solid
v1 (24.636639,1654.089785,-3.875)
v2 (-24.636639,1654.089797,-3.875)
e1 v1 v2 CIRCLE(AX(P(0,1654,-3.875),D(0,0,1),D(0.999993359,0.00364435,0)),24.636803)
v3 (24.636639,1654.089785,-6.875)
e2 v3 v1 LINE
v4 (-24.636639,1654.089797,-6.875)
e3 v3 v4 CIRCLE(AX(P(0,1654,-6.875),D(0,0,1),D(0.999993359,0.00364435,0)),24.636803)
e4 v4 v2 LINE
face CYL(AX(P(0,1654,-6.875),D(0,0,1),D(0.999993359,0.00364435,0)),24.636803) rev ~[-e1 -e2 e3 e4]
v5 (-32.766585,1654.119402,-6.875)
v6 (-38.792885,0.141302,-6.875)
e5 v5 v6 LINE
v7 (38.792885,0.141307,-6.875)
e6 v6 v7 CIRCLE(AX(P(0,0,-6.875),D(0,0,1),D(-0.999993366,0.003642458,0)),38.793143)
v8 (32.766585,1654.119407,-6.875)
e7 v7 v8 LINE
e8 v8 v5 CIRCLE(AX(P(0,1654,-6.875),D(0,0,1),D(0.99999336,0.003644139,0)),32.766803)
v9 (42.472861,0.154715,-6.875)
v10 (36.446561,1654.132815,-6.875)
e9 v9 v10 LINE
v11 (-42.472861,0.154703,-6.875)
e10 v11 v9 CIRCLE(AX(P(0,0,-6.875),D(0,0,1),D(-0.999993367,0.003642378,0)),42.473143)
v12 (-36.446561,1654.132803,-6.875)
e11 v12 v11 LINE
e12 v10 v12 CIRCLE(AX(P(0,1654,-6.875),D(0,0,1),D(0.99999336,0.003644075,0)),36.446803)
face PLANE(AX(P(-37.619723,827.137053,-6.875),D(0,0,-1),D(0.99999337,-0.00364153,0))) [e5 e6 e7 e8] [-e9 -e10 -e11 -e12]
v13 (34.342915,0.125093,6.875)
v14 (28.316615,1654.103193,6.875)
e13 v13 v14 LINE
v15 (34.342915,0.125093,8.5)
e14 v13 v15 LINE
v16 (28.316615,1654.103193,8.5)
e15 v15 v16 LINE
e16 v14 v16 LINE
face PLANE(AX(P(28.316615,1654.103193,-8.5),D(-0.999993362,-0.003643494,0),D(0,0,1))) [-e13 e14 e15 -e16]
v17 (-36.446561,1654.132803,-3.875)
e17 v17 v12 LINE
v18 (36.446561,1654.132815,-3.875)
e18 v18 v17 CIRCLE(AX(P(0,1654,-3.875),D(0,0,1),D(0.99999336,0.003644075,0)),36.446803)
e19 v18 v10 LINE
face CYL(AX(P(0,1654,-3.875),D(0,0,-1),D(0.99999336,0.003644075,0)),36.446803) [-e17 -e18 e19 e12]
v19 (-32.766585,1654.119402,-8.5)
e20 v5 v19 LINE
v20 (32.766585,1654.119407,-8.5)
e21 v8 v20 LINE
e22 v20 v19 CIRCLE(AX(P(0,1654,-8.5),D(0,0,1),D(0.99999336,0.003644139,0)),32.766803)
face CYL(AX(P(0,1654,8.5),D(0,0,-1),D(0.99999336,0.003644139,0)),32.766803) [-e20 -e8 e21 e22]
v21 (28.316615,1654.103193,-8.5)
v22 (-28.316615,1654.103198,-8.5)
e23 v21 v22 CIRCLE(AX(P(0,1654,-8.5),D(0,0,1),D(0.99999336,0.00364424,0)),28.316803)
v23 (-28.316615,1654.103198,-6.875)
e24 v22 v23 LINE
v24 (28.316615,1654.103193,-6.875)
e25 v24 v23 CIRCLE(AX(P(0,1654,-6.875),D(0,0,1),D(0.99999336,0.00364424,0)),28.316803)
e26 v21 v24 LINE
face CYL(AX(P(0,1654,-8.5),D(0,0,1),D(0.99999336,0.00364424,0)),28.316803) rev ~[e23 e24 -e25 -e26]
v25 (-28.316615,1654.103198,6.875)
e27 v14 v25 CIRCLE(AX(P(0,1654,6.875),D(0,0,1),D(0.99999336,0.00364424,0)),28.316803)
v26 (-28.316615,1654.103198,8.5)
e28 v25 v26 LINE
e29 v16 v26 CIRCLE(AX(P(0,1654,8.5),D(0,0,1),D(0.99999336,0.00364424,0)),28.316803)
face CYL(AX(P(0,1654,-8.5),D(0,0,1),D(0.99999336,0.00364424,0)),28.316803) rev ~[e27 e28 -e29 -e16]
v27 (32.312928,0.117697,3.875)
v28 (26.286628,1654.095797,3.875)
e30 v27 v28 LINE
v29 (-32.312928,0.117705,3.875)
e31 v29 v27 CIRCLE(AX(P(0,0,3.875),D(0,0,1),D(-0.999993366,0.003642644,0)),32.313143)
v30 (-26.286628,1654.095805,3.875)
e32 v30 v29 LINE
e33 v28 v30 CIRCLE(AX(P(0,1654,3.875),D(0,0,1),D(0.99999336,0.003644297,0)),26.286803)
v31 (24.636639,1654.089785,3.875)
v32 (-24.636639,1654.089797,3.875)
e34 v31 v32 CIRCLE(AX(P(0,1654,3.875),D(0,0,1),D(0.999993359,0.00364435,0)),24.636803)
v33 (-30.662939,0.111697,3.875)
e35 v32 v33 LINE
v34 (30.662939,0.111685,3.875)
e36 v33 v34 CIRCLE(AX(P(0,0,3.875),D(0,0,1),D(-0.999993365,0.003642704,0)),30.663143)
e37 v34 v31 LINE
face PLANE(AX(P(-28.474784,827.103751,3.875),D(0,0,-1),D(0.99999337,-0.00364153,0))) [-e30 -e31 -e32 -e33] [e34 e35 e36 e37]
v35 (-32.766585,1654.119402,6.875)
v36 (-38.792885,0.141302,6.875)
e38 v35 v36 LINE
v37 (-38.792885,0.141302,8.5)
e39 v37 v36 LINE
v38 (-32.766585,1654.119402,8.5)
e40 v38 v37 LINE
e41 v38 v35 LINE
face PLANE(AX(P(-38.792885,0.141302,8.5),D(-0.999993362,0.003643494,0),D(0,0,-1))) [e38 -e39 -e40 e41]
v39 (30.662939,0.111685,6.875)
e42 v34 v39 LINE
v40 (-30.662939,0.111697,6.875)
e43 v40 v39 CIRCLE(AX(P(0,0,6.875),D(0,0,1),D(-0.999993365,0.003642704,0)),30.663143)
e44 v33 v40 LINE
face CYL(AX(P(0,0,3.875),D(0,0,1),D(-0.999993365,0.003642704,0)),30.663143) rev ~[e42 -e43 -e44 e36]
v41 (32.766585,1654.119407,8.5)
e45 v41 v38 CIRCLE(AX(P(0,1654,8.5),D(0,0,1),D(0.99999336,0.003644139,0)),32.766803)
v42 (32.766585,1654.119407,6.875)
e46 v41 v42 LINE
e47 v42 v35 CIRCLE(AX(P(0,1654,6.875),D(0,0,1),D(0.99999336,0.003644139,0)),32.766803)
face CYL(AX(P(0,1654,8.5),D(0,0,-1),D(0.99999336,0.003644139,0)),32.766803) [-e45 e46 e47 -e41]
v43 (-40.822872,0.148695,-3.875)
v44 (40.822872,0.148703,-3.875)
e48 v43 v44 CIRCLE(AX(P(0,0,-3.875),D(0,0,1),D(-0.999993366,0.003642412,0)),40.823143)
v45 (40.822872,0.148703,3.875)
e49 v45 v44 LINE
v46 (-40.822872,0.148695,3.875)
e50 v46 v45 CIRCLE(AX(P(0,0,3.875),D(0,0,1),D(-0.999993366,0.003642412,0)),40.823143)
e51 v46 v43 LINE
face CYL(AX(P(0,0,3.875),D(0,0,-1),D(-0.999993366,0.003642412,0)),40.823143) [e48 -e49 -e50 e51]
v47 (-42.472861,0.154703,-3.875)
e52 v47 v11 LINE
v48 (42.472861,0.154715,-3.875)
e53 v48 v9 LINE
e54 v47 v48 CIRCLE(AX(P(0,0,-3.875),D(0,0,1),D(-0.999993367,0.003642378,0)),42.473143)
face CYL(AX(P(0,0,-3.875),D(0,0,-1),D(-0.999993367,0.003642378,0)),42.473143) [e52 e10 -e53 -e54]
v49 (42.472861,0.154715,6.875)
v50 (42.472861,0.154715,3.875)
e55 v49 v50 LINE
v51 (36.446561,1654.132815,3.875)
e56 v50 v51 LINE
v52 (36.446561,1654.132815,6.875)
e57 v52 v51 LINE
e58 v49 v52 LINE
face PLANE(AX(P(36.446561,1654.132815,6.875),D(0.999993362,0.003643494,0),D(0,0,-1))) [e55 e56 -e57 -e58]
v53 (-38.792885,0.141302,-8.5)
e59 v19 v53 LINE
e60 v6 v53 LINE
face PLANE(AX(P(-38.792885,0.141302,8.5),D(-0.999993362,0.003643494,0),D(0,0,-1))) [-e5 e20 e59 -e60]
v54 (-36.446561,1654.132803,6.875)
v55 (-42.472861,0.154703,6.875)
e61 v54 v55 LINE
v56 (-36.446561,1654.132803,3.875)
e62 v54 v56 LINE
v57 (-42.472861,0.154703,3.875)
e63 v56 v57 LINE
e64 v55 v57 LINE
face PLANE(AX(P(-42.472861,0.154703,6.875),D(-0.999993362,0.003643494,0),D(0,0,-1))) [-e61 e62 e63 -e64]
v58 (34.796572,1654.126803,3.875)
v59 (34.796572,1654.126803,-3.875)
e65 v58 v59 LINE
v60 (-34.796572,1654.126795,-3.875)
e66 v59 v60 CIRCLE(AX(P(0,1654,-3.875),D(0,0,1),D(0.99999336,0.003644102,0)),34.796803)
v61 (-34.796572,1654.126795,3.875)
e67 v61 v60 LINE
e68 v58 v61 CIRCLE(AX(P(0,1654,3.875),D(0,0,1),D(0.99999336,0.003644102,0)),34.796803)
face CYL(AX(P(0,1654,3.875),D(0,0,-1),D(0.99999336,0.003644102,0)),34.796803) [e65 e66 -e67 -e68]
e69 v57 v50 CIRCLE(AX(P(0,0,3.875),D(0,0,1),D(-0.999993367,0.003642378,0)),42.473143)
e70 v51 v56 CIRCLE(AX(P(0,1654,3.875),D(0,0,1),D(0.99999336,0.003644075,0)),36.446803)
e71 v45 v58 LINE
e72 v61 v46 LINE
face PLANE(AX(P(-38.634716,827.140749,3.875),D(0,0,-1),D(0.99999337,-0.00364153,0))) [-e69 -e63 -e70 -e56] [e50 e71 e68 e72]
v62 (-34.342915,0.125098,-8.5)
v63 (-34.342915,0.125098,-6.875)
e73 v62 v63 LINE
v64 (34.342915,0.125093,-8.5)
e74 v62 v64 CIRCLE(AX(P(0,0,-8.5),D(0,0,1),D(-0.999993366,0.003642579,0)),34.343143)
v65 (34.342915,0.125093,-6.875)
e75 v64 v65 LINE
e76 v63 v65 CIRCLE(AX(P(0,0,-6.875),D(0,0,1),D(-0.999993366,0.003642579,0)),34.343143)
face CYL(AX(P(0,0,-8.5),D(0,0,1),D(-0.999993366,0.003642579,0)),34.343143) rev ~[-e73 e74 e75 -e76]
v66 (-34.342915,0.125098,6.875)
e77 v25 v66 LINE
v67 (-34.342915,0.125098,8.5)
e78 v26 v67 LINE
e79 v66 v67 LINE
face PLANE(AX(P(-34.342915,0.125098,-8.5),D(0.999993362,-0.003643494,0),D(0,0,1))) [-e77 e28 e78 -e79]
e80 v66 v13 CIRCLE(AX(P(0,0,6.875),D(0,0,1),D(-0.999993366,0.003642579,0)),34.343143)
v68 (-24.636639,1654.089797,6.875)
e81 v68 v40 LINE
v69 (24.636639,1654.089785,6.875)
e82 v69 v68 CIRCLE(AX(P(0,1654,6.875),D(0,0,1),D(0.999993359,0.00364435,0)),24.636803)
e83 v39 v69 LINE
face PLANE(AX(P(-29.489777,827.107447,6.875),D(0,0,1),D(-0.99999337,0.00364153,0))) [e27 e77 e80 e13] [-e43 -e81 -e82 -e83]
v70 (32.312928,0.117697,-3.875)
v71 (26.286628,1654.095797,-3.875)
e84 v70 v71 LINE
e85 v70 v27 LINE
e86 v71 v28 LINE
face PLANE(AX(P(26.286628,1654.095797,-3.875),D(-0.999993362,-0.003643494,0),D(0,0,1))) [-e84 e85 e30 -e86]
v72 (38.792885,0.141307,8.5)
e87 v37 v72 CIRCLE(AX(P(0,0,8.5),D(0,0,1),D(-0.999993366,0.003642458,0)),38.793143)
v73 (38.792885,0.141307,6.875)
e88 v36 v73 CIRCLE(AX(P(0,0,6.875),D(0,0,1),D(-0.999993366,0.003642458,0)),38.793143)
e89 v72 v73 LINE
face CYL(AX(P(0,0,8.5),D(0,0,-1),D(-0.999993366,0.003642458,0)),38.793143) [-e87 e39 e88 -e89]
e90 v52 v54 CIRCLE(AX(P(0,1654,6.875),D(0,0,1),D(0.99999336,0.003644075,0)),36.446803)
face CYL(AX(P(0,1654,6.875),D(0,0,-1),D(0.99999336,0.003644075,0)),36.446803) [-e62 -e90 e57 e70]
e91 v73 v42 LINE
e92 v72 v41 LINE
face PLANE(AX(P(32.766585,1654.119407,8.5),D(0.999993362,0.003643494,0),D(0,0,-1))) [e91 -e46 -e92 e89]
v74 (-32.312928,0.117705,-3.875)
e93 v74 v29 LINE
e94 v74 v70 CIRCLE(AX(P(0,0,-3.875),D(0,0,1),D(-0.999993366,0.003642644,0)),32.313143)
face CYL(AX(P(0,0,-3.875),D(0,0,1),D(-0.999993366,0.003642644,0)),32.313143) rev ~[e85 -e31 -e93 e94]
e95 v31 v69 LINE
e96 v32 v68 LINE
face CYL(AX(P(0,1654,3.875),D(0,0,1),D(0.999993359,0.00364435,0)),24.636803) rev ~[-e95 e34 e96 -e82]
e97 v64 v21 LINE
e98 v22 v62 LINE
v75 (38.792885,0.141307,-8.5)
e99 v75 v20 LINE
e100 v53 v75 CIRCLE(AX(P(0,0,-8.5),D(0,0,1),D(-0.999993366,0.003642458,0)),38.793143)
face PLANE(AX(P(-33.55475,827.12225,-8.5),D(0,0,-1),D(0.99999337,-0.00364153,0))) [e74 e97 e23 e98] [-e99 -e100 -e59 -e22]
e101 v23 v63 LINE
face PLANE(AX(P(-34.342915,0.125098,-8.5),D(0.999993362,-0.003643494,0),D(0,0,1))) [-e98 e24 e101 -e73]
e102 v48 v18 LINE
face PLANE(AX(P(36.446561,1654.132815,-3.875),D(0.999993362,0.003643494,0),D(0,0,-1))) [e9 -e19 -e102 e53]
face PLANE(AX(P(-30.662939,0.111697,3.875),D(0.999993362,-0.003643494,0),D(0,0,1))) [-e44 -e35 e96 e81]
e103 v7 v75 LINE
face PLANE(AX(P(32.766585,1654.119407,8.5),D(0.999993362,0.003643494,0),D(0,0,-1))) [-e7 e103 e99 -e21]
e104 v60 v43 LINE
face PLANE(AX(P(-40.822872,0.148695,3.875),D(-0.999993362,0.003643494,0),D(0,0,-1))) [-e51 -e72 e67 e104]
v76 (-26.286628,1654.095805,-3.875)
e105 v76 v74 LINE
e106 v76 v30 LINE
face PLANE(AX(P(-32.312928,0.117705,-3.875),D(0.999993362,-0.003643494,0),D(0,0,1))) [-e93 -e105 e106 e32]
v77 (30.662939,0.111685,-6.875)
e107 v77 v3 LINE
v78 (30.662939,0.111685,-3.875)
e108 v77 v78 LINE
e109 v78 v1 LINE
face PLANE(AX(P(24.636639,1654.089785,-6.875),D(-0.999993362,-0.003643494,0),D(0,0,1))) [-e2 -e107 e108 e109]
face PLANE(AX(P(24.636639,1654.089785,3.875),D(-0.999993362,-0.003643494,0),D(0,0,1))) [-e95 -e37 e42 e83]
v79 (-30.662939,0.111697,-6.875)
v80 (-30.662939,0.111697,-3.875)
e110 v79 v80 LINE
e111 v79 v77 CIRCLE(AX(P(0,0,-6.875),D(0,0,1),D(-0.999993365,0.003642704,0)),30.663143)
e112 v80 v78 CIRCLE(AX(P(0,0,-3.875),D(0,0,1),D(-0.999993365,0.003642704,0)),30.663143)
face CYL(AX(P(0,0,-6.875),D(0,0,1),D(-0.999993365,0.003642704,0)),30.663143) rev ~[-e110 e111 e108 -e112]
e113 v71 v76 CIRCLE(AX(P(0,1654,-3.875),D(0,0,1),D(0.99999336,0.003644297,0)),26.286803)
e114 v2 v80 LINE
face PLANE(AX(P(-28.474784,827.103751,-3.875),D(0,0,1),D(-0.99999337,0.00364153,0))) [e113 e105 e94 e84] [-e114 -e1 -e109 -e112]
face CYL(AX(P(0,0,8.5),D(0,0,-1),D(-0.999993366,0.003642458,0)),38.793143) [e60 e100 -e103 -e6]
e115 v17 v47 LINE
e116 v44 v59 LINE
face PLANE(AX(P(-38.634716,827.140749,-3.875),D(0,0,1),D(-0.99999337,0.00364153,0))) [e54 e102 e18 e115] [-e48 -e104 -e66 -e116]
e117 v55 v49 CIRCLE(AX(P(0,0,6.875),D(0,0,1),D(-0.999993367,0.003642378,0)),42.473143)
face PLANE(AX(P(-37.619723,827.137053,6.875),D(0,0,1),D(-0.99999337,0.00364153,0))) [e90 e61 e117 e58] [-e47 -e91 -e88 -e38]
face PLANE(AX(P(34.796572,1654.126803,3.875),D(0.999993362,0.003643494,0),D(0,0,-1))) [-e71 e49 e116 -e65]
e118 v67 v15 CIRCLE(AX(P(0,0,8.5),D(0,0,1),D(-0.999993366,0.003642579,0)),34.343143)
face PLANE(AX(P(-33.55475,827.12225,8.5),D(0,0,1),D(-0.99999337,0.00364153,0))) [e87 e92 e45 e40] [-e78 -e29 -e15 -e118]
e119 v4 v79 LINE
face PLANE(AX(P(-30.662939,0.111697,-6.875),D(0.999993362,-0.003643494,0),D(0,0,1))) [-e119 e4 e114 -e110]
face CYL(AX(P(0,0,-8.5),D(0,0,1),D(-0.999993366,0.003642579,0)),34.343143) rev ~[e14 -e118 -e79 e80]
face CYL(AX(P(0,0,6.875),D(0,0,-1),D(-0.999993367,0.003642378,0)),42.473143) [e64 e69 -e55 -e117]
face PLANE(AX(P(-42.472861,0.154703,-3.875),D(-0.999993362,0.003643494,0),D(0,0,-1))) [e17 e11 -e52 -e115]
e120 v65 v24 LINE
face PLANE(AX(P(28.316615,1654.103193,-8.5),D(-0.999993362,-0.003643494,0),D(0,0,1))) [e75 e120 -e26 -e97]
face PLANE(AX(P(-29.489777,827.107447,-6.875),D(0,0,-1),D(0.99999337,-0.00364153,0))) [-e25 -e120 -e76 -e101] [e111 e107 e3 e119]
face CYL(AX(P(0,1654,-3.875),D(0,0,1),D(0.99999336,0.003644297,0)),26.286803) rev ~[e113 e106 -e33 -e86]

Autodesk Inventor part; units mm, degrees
ref_plane "Arbeitsebene2" through (0, 0, 0) normal (-1, 0, 0) x (0, 0, 1)
ref_plane "Arbeitsebene3" through (0, 1654, 0) normal (-0.1089035, -0.9940523, 0) x (0, 0, 1)
sketch "Pfad" plane through (0, 0, 0) normal (0, 0, 1) x (1, 0, 0)
  arc A0 (-36.5679, 0.1332) -> (36.5679, 0.1332) centre (0, 0) ccw
  arc A1 (30.5416, 1654.1113) -> (-30.5416, 1654.1113) centre (0, 1654) ccw
  line L0 (30.5416, 1654.1113) -> (36.5679, 0.1332)
  line L1 (-36.5679, 0.1332) -> (-30.5416, 1654.1113)
  dimension "d31" = 11.81
ref_plane "Profilebene" through (36.5679, 0.1332, 0) normal (-0.0036435, 0.9999934, 0) x (0, 0, 1)
sketch "Profilskizze" plane through (36.5679, 0.1332, 0) normal (-0.0036435, 0.9999934, 0) x (0, 0, 1)
  line L0 (-8.5, -2.225) -> (8.5, -2.225)
  line L1 (8.5, -2.225) -> (8.5, 2.225)
  line L2 (8.5, 2.225) -> (-8.5, 2.225)
  line L3 (-8.5, 2.225) -> (-8.5, -2.225)
  line L4 (-3.875, -4.255) -> (3.875, -4.255)
  line L5 (3.875, -4.255) -> (3.875, 4.255)
  line L6 (3.875, 4.255) -> (-3.875, 4.255)
  line L7 (-3.875, 4.255) -> (-3.875, -4.255)
  line L8 (-3.875, 0) -> (3.875, 0) construction
  line L9 (-6.875, -5.905) -> (-3.875, -5.905)
  line L10 (-3.875, -5.905) -> (-3.875, 5.905)
  line L11 (-3.875, 5.905) -> (-6.875, 5.905)
  line L12 (-6.875, 5.905) -> (-6.875, -5.905)
  line L13 (3.875, -5.905) -> (6.875, -5.905)
  line L14 (6.875, -5.905) -> (6.875, 5.905)
  line L15 (6.875, 5.905) -> (3.875, 5.905)
  line L16 (3.875, 5.905) -> (3.875, -5.905)
  line L17 (-8.5, 0) -> (8.5, 0) construction
  point P0 (0, 0)
  point P1 (0, 0)
  dimension "d21" = 4.45
  dimension "d22" = 8.51
  dimension "d23" = 7.75
  dimension "d24" = 3
  dimension "d31" = 11.81
  dimension "d32" = 17
sweep "Volumenkörper" add profiles "Profilskizze" path "Pfad"
pattern_of_one "Strand Pattern"
equation "\"d21\" = da_d2"
equation "\"d22\" = da_d1"
equation "\"d23\" = da_b1"
equation "\"d24\" = da_t1 + da_t2"
equation "\"d30\" = da_pt"
equation "\"da_p\" = 12.7"
equation "\"da_b1\" = 7.75"
equation "\"da_h2\" = 11.81"
equation "\"da_h3\" = 10.92"
equation "\"da_d1\" = 8.51"
equation "\"da_d2\" = 4.45"
equation "\"da_pt\" = 13.92"
equation "\"da_b\" = 17"
equation "\"da_t1\" = 1.5"
equation "\"da_t2\" = 1.5"
properties part number "Rollenkette 15ft" material "Stahl, Kohlenstoff"
